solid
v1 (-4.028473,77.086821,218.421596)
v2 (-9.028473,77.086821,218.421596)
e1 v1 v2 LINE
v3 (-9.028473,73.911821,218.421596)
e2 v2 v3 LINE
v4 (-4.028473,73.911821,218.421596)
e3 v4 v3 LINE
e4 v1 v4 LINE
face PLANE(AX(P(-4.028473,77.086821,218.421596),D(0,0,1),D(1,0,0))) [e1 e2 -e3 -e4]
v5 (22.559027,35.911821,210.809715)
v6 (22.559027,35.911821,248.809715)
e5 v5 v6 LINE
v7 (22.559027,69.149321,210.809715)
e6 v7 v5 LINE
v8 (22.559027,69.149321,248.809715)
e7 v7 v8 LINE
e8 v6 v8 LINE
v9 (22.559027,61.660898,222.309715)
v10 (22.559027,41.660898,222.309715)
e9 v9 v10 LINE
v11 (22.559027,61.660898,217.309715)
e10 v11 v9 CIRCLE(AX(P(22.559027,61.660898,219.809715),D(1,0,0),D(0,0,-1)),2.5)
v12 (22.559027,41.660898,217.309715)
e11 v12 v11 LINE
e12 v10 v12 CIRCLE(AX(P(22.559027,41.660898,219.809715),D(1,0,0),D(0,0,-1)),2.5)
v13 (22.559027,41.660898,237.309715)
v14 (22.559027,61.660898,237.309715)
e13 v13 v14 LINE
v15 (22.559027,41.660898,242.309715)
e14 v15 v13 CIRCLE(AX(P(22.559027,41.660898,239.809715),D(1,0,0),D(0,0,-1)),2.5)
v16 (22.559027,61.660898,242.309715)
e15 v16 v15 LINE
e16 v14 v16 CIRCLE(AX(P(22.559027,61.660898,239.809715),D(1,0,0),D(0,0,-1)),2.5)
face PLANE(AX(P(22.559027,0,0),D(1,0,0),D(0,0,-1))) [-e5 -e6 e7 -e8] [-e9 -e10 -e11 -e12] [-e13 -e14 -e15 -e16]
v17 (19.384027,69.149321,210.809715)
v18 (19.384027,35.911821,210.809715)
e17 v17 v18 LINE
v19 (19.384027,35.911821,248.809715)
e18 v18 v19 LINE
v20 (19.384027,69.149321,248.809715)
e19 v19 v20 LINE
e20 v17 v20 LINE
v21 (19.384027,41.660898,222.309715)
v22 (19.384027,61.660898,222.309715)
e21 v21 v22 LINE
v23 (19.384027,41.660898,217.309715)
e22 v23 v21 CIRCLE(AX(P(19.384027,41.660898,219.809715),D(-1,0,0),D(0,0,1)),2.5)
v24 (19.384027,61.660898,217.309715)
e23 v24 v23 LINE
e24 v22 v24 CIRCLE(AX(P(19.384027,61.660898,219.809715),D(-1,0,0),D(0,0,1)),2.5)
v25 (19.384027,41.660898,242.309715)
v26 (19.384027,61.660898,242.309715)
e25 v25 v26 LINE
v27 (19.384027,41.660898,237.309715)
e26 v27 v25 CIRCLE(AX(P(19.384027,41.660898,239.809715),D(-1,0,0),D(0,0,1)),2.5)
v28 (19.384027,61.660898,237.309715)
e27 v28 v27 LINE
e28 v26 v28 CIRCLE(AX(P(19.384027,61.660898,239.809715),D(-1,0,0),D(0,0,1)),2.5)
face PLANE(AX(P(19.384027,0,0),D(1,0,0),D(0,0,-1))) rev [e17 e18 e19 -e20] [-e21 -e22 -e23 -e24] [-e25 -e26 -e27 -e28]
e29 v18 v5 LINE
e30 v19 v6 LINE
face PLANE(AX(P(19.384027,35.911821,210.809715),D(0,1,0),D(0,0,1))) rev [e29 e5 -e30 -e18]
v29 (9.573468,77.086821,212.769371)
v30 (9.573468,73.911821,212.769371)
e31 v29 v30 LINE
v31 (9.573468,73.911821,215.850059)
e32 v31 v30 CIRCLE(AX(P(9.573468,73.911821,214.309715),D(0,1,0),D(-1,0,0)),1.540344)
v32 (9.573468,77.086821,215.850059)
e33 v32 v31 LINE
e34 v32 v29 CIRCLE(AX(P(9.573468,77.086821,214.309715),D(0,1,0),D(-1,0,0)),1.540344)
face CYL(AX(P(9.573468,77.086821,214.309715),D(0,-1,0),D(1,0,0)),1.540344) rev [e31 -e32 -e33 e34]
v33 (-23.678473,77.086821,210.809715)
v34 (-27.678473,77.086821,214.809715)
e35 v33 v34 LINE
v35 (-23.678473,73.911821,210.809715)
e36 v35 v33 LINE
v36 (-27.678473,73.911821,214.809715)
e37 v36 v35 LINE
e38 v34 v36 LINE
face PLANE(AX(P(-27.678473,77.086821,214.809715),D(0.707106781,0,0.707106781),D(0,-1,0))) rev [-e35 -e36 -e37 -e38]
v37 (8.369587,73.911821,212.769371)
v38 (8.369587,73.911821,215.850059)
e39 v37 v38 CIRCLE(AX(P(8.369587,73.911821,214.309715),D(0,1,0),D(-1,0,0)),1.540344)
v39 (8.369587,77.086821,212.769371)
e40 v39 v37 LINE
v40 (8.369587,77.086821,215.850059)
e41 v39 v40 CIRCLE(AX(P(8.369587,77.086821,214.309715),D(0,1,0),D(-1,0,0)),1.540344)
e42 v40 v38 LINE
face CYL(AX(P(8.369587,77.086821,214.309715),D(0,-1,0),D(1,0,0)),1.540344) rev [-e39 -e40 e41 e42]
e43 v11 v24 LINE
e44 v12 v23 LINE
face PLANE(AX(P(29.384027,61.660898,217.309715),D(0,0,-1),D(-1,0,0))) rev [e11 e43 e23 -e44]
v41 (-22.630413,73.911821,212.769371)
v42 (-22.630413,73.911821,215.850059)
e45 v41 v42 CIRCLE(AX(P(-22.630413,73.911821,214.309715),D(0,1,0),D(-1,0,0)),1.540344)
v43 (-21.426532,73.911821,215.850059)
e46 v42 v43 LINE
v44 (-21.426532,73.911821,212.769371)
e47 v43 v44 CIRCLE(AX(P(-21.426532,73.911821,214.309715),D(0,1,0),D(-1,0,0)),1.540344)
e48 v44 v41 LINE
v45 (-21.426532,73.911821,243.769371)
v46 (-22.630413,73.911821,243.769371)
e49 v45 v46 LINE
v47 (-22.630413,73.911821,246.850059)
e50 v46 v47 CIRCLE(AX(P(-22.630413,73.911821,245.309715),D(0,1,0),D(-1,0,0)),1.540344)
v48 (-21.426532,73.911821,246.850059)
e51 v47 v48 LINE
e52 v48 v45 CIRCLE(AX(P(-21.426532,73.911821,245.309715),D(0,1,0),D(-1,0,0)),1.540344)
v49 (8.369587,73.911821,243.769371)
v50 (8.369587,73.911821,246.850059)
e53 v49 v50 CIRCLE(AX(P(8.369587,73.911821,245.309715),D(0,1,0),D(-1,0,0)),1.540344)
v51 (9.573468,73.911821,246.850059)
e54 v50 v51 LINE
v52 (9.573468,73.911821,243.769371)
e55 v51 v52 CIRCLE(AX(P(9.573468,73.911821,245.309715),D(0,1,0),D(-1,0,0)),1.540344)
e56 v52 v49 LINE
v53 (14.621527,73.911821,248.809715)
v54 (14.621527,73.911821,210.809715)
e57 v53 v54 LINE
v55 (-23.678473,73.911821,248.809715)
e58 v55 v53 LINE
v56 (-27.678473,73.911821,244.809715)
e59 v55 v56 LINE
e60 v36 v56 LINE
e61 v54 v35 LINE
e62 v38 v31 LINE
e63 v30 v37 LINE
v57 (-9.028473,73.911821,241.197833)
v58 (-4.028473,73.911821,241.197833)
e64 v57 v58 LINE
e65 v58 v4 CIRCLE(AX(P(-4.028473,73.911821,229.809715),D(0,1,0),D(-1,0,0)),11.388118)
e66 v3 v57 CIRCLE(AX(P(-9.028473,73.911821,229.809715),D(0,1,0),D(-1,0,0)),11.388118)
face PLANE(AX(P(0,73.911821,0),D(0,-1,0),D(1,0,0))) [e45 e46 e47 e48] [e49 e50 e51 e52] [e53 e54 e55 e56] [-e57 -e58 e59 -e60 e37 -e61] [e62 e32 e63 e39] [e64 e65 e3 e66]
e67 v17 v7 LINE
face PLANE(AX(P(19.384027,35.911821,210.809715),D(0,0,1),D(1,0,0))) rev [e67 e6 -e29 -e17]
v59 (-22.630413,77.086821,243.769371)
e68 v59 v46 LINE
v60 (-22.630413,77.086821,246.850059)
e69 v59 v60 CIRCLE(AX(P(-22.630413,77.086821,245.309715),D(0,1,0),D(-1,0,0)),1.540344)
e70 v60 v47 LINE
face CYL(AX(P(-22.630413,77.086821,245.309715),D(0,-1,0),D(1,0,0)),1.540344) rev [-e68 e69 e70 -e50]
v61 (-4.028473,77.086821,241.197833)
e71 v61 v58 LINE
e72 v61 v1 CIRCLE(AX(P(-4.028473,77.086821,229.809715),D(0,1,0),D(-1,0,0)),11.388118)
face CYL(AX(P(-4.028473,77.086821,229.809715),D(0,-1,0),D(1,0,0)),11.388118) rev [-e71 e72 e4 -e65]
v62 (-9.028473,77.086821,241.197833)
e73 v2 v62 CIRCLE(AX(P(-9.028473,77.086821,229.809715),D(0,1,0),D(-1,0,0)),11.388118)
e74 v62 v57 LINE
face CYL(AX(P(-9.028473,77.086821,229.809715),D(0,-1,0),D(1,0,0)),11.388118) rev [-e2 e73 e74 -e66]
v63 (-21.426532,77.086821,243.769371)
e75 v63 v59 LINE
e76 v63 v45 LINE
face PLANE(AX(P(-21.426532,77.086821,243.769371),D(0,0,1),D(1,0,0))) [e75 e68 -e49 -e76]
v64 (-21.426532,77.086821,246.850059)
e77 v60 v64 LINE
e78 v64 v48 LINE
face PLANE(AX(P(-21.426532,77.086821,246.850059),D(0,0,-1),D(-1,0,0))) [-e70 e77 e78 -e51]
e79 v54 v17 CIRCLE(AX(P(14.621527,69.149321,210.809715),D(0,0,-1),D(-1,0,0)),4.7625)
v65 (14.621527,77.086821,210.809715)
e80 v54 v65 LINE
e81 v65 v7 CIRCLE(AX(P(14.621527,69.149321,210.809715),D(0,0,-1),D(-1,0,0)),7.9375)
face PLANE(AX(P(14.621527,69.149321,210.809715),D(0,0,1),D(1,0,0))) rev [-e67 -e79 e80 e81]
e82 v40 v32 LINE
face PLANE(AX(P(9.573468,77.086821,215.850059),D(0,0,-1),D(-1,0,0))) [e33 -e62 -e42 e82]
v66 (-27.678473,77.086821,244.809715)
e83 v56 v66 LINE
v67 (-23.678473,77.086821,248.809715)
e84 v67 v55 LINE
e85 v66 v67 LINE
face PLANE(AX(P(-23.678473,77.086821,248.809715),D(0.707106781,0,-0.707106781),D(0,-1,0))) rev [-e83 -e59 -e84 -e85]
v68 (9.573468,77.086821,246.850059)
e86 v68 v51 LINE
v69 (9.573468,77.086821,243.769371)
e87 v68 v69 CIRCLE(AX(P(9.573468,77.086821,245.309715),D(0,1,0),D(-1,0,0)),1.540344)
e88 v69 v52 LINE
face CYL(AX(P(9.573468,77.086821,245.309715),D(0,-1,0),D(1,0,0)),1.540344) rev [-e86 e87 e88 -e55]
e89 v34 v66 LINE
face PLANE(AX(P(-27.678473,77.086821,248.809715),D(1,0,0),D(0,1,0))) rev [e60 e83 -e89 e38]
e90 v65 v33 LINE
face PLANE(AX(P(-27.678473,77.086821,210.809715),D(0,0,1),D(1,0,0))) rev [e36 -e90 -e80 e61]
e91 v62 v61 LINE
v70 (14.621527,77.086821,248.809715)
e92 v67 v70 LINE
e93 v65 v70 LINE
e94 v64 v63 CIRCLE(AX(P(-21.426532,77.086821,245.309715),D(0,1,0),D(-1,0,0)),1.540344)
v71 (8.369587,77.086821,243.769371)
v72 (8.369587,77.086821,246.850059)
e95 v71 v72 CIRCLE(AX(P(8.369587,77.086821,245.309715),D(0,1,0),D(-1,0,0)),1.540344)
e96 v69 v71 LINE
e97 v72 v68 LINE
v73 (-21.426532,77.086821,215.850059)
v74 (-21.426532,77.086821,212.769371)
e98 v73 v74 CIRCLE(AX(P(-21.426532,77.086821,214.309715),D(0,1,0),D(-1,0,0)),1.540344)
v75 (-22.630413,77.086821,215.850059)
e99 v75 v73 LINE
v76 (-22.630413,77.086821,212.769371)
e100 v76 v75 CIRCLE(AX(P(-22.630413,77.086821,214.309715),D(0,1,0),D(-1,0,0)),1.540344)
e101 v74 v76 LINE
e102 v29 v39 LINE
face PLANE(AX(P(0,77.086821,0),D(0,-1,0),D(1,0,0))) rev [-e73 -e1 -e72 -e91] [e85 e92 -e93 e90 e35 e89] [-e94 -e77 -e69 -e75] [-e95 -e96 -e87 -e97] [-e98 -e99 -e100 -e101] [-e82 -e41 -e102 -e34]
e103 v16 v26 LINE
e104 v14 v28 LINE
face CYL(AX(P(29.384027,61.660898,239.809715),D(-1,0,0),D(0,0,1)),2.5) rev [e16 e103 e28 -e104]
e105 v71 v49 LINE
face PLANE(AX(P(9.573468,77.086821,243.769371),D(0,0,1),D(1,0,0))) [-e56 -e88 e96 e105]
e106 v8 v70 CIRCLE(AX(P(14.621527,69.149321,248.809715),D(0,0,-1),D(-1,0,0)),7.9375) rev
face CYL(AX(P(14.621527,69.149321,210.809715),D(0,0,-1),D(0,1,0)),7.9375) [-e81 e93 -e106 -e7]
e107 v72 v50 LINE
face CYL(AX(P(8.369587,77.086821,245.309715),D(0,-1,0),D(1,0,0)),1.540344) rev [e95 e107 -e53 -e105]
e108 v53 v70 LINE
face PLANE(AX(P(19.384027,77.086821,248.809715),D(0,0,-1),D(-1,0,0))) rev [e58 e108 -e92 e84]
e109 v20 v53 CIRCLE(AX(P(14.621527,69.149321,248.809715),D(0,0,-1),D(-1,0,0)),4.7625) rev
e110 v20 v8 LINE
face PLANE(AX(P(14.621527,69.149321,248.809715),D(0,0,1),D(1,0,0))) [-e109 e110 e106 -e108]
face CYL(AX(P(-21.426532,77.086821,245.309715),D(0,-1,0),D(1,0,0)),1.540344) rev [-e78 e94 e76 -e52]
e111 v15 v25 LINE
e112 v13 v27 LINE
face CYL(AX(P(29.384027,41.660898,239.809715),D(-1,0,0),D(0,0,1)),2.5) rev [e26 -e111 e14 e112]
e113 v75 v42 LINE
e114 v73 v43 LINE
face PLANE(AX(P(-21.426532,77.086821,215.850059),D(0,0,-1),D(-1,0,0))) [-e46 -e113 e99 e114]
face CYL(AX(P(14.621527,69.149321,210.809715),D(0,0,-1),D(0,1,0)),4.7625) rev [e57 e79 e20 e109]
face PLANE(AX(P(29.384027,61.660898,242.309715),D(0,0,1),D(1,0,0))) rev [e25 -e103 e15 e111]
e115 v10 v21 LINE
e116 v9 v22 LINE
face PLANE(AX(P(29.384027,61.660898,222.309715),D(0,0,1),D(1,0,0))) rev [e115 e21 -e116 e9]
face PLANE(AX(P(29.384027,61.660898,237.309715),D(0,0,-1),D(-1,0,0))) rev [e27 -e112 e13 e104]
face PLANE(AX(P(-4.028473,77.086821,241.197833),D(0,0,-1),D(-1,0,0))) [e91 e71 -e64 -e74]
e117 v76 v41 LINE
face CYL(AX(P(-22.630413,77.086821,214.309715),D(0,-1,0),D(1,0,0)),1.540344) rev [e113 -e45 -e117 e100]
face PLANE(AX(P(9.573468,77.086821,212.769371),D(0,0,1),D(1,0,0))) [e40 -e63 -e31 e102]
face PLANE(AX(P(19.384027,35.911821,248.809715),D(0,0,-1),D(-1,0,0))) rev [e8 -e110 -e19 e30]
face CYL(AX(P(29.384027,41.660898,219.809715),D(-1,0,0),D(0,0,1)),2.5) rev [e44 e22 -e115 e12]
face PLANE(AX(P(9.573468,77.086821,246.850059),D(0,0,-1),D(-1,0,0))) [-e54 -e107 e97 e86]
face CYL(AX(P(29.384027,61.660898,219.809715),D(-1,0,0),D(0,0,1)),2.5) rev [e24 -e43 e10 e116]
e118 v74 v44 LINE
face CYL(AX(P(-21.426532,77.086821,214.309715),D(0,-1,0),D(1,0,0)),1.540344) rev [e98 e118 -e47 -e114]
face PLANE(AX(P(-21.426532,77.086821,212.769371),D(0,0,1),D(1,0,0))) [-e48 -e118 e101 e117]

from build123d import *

# Parameters (mm, degrees)
SKETCH1_W                    = 38
SKETCH1_H                    = 38
BASE_FLANGE1_DEPTH           = 3.175
EDGE_FLANGE1_STRIP_W         = 22.225
EDGE_FLANGE1_STRIP_H         = 3.175
EDGE_FLANGE1_STRIP_CUT_DEPTH = 38
EDGE_FLANGE1_DEPTH           = 38
EDGE_FLANGE1_START           = 3.175
EDGE_FLANGE1_PROFILE_W       = 38
EDGE_FLANGE1_PROFILE_H       = 42.3
EDGE_FLANGE1_FLAT_DEPTH      = 3.175
CHAMFER1_SIZE                = 4
CUT_EXTRUDE1_DEPTH           = 10


# Sheet-metal steps are written as plain solids
with BuildPart() as part:
    # Sketch1 → Base-Flange1 (new body)
    with BuildSketch(Plane.ZY.offset(-22.559027455)):
        with Locations((229.809714632, 54.911820509)):
            Rectangle(SKETCH1_W, SKETCH1_H)
    extrude(amount=BASE_FLANGE1_DEPTH)

    # Edge-Flange1 strip (across the edge) → Edge-Flange1 strip cut (cut)
    with BuildSketch(Plane(origin=(19.384027455, 73.911820509, 248.809714632), x_dir=(0, -1, 0), z_dir=(0, 0, -1))):
        with Locations((-6.35, -1.5875)):
            Rectangle(EDGE_FLANGE1_STRIP_W, EDGE_FLANGE1_STRIP_H)
    extrude(amount=EDGE_FLANGE1_STRIP_CUT_DEPTH, mode=Mode.SUBTRACT)

    # Edge-Flange1 bend section (across the edge) → Edge-Flange1 (add)
    with BuildSketch(Plane(origin=(19.384027455, 73.911820509, 248.809714632), x_dir=(0, -1, 0), z_dir=(0, 0, -1))):
        with BuildLine():
            Line((-3.175, 4.7625), (0, 4.7625))
            ThreePointArc((0, 4.7625), (1.394903955, 1.394903955), (4.7625, 0))
            Line((4.7625, 0), (4.7625, -3.175))
            ThreePointArc((4.7625, -3.175), (-0.850160076, -0.850160076), (-3.175, 4.7625))
        make_face()
    extrude(amount=EDGE_FLANGE1_DEPTH)

    # Edge-Flange1 profile (on flange) → Edge-Flange1 flat (add)
    with BuildSketch(Plane(origin=(19.384027455, 73.911820509, 0), x_dir=(0, 0, -1), z_dir=(0, 1, 0)).offset(EDGE_FLANGE1_START)):
        with Locations((-229.809714632, 25.9125)):
            Rectangle(EDGE_FLANGE1_PROFILE_W, EDGE_FLANGE1_PROFILE_H)
        with BuildLine():
            Line((-246.850058636, 9.810559352), (-246.850058636, 11.014440648))
            ThreePointArc((-246.850058636, 11.014440648), (-245.309714632, 12.554784652), (-243.769370628, 11.014440648))
            Line((-243.769370628, 11.014440648), (-243.769370628, 9.810559352))
            ThreePointArc((-243.769370628, 9.810559352), (-245.309714632, 8.270215348), (-246.850058636, 9.810559352))
        make_face(mode=Mode.SUBTRACT)
        with BuildLine():
            Line((-215.850058636, 9.810559352), (-215.850058636, 11.014440648))
            ThreePointArc((-215.850058636, 11.014440648), (-214.309714632, 12.554784652), (-212.769370628, 11.014440648))
            Line((-212.769370628, 11.014440648), (-212.769370628, 9.810559352))
            ThreePointArc((-212.769370628, 9.810559352), (-214.309714632, 8.270215348), (-215.850058636, 9.810559352))
        make_face(mode=Mode.SUBTRACT)
        with BuildLine():
            Line((-241.197832947, 23.4125), (-241.197832947, 28.4125))
            ThreePointArc((-241.197832947, 28.4125), (-229.809714632, 39.800618315), (-218.421596317, 28.4125))
            Line((-218.421596317, 28.4125), (-218.421596317, 23.4125))
            ThreePointArc((-218.421596317, 23.4125), (-229.809714632, 12.024381685), (-241.197832947, 23.4125))
        make_face(mode=Mode.SUBTRACT)
        with BuildLine():
            Line((-246.850058636, 40.810559352), (-246.850058636, 42.014440648))
            ThreePointArc((-246.850058636, 42.014440648), (-245.309714632, 43.554784652), (-243.769370628, 42.014440648))
            Line((-243.769370628, 42.014440648), (-243.769370628, 40.810559352))
            ThreePointArc((-243.769370628, 40.810559352), (-245.309714632, 39.270215348), (-246.850058636, 40.810559352))
        make_face(mode=Mode.SUBTRACT)
        with BuildLine():
            Line((-215.850058636, 40.810559352), (-215.850058636, 42.014440648))
            ThreePointArc((-215.850058636, 42.014440648), (-214.309714632, 43.554784652), (-212.769370628, 42.014440648))
            Line((-212.769370628, 42.014440648), (-212.769370628, 40.810559352))
            ThreePointArc((-212.769370628, 40.810559352), (-214.309714632, 39.270215348), (-215.850058636, 40.810559352))
        make_face(mode=Mode.SUBTRACT)
    extrude(amount=-EDGE_FLANGE1_FLAT_DEPTH)

    # Chamfer1
    chamfer1_edges = [part.edges().sort_by_distance(p)[0] for p in [
        (-27.678472545, 75.499320509, 248.809714632),
        (-27.678472545, 75.499320509, 210.809714632),
    ]]
    chamfer(chamfer1_edges, length=CHAMFER1_SIZE)

    # Sketch9 → Cut-Extrude1 (cut)
    with BuildSketch(Plane.ZY.offset(-19.384027455)):
        with BuildLine():
            Line((242.309714632, 61.660898278), (242.309714632, 41.660898278))
            ThreePointArc((242.309714632, 41.660898278), (239.809714632, 39.160898278), (237.309714632, 41.660898278))
            Line((237.309714632, 41.660898278), (237.309714632, 61.660898278))
            ThreePointArc((237.309714632, 61.660898278), (239.809714632, 64.160898278), (242.309714632, 61.660898278))
        make_face()
        with BuildLine():
            Line((222.309714633, 61.660898278), (222.309714633, 41.660898278))
            ThreePointArc((222.309714633, 41.660898278), (219.809714633, 39.160898278), (217.309714633, 41.660898278))
            Line((217.309714633, 41.660898278), (217.309714633, 61.660898278))
            ThreePointArc((217.309714633, 61.660898278), (219.809714633, 64.160898278), (222.309714633, 61.660898278))
        make_face()
    extrude(amount=-CUT_EXTRUDE1_DEPTH, mode=Mode.SUBTRACT)


solid = part.part
